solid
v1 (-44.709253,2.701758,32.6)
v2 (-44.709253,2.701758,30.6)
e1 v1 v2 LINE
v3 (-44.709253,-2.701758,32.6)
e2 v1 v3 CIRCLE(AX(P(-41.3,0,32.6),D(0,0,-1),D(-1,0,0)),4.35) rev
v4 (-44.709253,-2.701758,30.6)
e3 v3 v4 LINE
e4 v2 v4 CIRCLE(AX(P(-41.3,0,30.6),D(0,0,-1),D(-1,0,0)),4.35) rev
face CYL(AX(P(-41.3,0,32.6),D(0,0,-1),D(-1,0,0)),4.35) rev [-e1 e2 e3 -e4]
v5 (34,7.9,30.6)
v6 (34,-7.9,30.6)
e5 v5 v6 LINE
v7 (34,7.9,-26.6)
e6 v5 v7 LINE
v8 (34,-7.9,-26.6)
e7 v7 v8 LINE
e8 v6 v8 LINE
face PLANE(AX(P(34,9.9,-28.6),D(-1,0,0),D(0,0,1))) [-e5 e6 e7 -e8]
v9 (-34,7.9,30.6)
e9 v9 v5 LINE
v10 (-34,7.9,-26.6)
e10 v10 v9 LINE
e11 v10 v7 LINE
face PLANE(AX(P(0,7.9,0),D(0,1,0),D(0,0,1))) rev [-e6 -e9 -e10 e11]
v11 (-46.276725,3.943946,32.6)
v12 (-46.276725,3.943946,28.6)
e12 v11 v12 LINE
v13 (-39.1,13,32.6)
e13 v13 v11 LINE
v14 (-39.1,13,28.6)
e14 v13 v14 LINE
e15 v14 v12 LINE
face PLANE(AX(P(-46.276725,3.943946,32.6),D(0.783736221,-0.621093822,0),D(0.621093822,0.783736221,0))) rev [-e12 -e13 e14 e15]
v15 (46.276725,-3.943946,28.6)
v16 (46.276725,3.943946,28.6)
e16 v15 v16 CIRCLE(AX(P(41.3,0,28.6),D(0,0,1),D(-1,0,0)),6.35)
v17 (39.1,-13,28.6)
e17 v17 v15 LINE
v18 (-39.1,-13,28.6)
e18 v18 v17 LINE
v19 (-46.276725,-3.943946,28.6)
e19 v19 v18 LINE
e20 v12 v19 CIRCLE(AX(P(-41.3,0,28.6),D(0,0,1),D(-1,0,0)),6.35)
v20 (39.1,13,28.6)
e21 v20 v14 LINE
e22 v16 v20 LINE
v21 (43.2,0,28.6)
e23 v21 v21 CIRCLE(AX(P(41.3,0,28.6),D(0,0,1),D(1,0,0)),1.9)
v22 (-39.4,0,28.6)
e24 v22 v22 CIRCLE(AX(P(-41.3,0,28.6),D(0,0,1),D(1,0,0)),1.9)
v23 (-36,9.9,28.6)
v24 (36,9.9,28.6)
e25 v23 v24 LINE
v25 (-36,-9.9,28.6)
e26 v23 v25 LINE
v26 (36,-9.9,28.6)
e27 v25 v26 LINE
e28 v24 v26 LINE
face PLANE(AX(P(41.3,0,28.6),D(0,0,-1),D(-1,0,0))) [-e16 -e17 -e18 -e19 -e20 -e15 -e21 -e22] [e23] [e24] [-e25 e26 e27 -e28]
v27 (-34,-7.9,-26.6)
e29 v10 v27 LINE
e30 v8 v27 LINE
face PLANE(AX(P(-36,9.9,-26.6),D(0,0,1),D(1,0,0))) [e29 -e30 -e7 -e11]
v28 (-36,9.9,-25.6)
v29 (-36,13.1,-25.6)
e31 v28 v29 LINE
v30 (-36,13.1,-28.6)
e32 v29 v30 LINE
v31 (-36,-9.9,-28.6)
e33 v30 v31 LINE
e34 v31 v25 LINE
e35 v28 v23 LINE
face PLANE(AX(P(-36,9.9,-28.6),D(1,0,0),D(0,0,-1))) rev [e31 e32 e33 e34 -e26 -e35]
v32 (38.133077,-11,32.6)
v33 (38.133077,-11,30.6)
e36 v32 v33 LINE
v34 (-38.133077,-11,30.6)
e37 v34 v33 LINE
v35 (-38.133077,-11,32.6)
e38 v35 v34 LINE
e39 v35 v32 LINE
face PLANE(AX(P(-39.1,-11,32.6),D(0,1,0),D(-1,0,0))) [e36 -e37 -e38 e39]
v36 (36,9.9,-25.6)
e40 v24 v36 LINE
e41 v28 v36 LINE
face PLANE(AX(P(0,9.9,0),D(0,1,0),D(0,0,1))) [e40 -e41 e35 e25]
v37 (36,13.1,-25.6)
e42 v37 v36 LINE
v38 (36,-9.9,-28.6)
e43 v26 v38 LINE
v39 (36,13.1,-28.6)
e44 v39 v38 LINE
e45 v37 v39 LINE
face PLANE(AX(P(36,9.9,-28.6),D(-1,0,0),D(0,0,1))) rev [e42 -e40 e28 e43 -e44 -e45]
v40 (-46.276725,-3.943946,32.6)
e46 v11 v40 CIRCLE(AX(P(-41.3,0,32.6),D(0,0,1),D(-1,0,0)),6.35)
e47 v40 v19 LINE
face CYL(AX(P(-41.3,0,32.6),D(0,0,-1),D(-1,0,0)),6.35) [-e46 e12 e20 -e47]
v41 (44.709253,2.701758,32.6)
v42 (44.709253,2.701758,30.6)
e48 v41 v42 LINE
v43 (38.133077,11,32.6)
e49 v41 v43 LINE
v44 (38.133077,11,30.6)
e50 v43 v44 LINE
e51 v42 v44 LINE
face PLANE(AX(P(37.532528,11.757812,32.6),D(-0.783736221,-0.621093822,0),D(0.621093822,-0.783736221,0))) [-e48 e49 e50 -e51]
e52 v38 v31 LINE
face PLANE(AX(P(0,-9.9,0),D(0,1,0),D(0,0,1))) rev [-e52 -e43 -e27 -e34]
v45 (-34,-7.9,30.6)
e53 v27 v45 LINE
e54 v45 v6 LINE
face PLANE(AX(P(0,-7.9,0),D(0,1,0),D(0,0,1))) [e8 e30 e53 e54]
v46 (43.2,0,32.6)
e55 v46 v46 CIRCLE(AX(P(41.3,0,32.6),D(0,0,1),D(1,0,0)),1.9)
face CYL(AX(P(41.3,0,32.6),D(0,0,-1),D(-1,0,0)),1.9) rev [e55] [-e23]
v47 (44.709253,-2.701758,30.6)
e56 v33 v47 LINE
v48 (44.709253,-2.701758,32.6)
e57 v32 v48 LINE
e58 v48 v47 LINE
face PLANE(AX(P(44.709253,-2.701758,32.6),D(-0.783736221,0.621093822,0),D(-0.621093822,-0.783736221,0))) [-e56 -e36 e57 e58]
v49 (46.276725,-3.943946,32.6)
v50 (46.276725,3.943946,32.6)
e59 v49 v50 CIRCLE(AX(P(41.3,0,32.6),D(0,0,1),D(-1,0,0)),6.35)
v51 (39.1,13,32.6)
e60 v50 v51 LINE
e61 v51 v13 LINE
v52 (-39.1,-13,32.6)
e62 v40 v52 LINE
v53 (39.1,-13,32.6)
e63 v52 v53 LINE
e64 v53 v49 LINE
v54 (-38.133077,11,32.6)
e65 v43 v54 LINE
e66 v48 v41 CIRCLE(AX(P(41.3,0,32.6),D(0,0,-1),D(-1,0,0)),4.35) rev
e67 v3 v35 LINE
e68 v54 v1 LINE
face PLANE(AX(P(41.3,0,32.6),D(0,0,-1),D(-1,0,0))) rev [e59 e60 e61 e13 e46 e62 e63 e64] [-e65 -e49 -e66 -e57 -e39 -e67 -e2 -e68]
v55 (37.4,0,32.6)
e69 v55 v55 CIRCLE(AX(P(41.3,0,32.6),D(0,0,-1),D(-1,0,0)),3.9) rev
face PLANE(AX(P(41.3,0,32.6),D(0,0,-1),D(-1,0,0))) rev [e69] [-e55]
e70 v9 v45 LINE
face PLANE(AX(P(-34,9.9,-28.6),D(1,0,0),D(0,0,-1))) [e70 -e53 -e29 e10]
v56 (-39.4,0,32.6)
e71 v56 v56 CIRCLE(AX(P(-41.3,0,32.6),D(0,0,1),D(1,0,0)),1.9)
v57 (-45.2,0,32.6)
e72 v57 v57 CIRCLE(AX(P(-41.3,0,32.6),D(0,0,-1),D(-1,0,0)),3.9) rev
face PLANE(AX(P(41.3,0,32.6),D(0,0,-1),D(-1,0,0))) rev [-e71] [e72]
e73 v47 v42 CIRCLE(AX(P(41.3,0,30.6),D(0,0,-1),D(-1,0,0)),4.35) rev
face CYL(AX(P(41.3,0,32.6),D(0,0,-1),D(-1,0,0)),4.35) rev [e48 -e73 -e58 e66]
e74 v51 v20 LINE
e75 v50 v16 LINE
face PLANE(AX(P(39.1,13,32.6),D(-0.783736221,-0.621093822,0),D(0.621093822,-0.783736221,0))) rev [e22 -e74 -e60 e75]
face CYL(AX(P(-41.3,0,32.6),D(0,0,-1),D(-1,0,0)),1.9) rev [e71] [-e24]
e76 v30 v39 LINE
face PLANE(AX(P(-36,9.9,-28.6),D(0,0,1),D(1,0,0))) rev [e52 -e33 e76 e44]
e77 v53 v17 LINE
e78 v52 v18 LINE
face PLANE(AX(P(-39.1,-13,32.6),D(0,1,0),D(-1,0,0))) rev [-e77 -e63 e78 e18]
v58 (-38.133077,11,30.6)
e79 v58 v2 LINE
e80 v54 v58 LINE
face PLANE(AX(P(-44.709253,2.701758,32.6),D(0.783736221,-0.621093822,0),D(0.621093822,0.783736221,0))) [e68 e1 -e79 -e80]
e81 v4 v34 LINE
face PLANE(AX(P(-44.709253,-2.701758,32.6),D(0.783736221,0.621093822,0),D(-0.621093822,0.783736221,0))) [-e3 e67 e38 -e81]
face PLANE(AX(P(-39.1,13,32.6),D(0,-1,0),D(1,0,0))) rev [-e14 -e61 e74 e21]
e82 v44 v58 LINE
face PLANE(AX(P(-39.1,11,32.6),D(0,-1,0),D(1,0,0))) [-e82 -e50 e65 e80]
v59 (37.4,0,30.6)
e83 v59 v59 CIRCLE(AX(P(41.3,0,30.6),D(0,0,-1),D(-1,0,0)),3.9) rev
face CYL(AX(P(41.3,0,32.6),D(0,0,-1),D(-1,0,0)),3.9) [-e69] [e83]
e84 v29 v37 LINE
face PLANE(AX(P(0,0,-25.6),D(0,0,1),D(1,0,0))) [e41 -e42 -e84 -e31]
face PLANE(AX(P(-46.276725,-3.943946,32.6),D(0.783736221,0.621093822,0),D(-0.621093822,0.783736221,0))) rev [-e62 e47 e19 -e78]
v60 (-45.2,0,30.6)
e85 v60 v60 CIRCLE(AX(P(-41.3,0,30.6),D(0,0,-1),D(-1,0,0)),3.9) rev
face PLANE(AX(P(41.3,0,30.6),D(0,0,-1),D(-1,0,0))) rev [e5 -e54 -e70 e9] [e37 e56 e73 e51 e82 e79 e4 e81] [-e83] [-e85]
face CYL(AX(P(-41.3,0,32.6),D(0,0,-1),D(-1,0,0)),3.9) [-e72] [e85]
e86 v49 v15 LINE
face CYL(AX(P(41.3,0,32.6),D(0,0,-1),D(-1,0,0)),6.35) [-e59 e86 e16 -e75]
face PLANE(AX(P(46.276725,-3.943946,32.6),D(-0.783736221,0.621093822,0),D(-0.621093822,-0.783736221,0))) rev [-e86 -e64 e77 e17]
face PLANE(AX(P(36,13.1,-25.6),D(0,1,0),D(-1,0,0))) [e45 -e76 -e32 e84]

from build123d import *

# Parameters (mm, degrees)
SKETCH1_W           = 72
SKETCH1_H           = 57.2
BOSS_EXTRUDE1_DEPTH = 9.9
SKETCH2_R           = 1.9
BOSS_EXTRUDE2_DEPTH = 4
SKETCH4_W           = 72
SKETCH4_H           = 23
BOSS_EXTRUDE3_DEPTH = 3
SHELL1_START        = -26.6
SHELL1_OUTLINE_W    = 68
SHELL1_OUTLINE_H    = 15.8
SHELL1_DEPTH        = 59.2
SHELL1_START_2      = 30.6
SHELL1_2_OUTLINE_R  = 3.9
SHELL1_2_OUTLINE_W  = 68
SHELL1_2_OUTLINE_H  = 15.8
SHELL1_2_DEPTH      = 2


# Read off the part's stored shape, not the designer's step: Shell1
with BuildPart() as part:
    # Sketch1 → Boss-Extrude1 (new, symmetric)
    with BuildSketch(Plane(origin=(0, 0, 0), x_dir=(1, 0, 0), z_dir=(0, 1, 0))):
        Rectangle(SKETCH1_W, SKETCH1_H)
    extrude(amount=BOSS_EXTRUDE1_DEPTH, both=True)

    # Sketch2 → Boss-Extrude2 (add)
    with BuildSketch(Plane.XY.offset(28.6)):
        with BuildLine():
            Line((-39.1, 13), (39.1, 13))
            Line((39.1, 13), (46.276725004, 3.94394577))
            ThreePointArc((46.276725004, 3.94394577), (47.65, 0), (46.276725004, -3.94394577))
            Line((46.276725004, -3.94394577), (39.1, -13))
            Line((39.1, -13), (-39.1, -13))
            Line((-39.1, -13), (-46.276725004, -3.94394577))
            ThreePointArc((-46.276725004, -3.94394577), (-47.65, 0), (-46.276725004, 3.94394577))
            Line((-46.276725004, 3.94394577), (-39.1, 13))
        make_face()
        with Locations((-41.3, 0)):
            Circle(SKETCH2_R, mode=Mode.SUBTRACT)
        with Locations((41.3, 0)):
            Circle(SKETCH2_R, mode=Mode.SUBTRACT)
    extrude(amount=BOSS_EXTRUDE2_DEPTH)

    # Sketch4 → Boss-Extrude3 (add)
    with BuildSketch(Plane(origin=(0, 0, -28.6), x_dir=(-1, 0, 0), z_dir=(0, 0, -1))):
        with Locations((0, 1.6)):
            Rectangle(SKETCH4_W, SKETCH4_H)
    extrude(amount=-BOSS_EXTRUDE3_DEPTH)

    # Shell1 outline → Shell1 (cut)
    with BuildSketch(Plane.XY.offset(SHELL1_START)):
        Rectangle(SHELL1_OUTLINE_W, SHELL1_OUTLINE_H)
    extrude(amount=SHELL1_DEPTH, mode=Mode.SUBTRACT)

    # Shell1 2 outline → Shell1 2 (cut)
    with BuildSketch(Plane.XY.offset(SHELL1_START_2)):
        with BuildLine():
            Line((-38.133077283, 11), (-44.709252562, 2.701758126))
            ThreePointArc((-44.709252562, 2.701758126), (-45.65, 0), (-44.709252562, -2.701758126))
            Line((-44.709252562, -2.701758126), (-38.133077283, -11))
            Line((-38.133077283, -11), (38.133077283, -11))
            Line((38.133077283, -11), (44.709252562, -2.701758126))
            ThreePointArc((44.709252562, -2.701758126), (45.65, 0), (44.709252562, 2.701758126))
            Line((44.709252562, 2.701758126), (38.133077283, 11))
            Line((38.133077283, 11), (-38.133077283, 11))
        make_face()
        with Locations((-41.3, 0)):
            Circle(SHELL1_2_OUTLINE_R, mode=Mode.SUBTRACT)
        Rectangle(SHELL1_2_OUTLINE_W, SHELL1_2_OUTLINE_H, mode=Mode.SUBTRACT)
        with Locations((41.3, 0)):
            Circle(SHELL1_2_OUTLINE_R, mode=Mode.SUBTRACT)
    extrude(amount=SHELL1_2_DEPTH, mode=Mode.SUBTRACT)


solid = part.part
